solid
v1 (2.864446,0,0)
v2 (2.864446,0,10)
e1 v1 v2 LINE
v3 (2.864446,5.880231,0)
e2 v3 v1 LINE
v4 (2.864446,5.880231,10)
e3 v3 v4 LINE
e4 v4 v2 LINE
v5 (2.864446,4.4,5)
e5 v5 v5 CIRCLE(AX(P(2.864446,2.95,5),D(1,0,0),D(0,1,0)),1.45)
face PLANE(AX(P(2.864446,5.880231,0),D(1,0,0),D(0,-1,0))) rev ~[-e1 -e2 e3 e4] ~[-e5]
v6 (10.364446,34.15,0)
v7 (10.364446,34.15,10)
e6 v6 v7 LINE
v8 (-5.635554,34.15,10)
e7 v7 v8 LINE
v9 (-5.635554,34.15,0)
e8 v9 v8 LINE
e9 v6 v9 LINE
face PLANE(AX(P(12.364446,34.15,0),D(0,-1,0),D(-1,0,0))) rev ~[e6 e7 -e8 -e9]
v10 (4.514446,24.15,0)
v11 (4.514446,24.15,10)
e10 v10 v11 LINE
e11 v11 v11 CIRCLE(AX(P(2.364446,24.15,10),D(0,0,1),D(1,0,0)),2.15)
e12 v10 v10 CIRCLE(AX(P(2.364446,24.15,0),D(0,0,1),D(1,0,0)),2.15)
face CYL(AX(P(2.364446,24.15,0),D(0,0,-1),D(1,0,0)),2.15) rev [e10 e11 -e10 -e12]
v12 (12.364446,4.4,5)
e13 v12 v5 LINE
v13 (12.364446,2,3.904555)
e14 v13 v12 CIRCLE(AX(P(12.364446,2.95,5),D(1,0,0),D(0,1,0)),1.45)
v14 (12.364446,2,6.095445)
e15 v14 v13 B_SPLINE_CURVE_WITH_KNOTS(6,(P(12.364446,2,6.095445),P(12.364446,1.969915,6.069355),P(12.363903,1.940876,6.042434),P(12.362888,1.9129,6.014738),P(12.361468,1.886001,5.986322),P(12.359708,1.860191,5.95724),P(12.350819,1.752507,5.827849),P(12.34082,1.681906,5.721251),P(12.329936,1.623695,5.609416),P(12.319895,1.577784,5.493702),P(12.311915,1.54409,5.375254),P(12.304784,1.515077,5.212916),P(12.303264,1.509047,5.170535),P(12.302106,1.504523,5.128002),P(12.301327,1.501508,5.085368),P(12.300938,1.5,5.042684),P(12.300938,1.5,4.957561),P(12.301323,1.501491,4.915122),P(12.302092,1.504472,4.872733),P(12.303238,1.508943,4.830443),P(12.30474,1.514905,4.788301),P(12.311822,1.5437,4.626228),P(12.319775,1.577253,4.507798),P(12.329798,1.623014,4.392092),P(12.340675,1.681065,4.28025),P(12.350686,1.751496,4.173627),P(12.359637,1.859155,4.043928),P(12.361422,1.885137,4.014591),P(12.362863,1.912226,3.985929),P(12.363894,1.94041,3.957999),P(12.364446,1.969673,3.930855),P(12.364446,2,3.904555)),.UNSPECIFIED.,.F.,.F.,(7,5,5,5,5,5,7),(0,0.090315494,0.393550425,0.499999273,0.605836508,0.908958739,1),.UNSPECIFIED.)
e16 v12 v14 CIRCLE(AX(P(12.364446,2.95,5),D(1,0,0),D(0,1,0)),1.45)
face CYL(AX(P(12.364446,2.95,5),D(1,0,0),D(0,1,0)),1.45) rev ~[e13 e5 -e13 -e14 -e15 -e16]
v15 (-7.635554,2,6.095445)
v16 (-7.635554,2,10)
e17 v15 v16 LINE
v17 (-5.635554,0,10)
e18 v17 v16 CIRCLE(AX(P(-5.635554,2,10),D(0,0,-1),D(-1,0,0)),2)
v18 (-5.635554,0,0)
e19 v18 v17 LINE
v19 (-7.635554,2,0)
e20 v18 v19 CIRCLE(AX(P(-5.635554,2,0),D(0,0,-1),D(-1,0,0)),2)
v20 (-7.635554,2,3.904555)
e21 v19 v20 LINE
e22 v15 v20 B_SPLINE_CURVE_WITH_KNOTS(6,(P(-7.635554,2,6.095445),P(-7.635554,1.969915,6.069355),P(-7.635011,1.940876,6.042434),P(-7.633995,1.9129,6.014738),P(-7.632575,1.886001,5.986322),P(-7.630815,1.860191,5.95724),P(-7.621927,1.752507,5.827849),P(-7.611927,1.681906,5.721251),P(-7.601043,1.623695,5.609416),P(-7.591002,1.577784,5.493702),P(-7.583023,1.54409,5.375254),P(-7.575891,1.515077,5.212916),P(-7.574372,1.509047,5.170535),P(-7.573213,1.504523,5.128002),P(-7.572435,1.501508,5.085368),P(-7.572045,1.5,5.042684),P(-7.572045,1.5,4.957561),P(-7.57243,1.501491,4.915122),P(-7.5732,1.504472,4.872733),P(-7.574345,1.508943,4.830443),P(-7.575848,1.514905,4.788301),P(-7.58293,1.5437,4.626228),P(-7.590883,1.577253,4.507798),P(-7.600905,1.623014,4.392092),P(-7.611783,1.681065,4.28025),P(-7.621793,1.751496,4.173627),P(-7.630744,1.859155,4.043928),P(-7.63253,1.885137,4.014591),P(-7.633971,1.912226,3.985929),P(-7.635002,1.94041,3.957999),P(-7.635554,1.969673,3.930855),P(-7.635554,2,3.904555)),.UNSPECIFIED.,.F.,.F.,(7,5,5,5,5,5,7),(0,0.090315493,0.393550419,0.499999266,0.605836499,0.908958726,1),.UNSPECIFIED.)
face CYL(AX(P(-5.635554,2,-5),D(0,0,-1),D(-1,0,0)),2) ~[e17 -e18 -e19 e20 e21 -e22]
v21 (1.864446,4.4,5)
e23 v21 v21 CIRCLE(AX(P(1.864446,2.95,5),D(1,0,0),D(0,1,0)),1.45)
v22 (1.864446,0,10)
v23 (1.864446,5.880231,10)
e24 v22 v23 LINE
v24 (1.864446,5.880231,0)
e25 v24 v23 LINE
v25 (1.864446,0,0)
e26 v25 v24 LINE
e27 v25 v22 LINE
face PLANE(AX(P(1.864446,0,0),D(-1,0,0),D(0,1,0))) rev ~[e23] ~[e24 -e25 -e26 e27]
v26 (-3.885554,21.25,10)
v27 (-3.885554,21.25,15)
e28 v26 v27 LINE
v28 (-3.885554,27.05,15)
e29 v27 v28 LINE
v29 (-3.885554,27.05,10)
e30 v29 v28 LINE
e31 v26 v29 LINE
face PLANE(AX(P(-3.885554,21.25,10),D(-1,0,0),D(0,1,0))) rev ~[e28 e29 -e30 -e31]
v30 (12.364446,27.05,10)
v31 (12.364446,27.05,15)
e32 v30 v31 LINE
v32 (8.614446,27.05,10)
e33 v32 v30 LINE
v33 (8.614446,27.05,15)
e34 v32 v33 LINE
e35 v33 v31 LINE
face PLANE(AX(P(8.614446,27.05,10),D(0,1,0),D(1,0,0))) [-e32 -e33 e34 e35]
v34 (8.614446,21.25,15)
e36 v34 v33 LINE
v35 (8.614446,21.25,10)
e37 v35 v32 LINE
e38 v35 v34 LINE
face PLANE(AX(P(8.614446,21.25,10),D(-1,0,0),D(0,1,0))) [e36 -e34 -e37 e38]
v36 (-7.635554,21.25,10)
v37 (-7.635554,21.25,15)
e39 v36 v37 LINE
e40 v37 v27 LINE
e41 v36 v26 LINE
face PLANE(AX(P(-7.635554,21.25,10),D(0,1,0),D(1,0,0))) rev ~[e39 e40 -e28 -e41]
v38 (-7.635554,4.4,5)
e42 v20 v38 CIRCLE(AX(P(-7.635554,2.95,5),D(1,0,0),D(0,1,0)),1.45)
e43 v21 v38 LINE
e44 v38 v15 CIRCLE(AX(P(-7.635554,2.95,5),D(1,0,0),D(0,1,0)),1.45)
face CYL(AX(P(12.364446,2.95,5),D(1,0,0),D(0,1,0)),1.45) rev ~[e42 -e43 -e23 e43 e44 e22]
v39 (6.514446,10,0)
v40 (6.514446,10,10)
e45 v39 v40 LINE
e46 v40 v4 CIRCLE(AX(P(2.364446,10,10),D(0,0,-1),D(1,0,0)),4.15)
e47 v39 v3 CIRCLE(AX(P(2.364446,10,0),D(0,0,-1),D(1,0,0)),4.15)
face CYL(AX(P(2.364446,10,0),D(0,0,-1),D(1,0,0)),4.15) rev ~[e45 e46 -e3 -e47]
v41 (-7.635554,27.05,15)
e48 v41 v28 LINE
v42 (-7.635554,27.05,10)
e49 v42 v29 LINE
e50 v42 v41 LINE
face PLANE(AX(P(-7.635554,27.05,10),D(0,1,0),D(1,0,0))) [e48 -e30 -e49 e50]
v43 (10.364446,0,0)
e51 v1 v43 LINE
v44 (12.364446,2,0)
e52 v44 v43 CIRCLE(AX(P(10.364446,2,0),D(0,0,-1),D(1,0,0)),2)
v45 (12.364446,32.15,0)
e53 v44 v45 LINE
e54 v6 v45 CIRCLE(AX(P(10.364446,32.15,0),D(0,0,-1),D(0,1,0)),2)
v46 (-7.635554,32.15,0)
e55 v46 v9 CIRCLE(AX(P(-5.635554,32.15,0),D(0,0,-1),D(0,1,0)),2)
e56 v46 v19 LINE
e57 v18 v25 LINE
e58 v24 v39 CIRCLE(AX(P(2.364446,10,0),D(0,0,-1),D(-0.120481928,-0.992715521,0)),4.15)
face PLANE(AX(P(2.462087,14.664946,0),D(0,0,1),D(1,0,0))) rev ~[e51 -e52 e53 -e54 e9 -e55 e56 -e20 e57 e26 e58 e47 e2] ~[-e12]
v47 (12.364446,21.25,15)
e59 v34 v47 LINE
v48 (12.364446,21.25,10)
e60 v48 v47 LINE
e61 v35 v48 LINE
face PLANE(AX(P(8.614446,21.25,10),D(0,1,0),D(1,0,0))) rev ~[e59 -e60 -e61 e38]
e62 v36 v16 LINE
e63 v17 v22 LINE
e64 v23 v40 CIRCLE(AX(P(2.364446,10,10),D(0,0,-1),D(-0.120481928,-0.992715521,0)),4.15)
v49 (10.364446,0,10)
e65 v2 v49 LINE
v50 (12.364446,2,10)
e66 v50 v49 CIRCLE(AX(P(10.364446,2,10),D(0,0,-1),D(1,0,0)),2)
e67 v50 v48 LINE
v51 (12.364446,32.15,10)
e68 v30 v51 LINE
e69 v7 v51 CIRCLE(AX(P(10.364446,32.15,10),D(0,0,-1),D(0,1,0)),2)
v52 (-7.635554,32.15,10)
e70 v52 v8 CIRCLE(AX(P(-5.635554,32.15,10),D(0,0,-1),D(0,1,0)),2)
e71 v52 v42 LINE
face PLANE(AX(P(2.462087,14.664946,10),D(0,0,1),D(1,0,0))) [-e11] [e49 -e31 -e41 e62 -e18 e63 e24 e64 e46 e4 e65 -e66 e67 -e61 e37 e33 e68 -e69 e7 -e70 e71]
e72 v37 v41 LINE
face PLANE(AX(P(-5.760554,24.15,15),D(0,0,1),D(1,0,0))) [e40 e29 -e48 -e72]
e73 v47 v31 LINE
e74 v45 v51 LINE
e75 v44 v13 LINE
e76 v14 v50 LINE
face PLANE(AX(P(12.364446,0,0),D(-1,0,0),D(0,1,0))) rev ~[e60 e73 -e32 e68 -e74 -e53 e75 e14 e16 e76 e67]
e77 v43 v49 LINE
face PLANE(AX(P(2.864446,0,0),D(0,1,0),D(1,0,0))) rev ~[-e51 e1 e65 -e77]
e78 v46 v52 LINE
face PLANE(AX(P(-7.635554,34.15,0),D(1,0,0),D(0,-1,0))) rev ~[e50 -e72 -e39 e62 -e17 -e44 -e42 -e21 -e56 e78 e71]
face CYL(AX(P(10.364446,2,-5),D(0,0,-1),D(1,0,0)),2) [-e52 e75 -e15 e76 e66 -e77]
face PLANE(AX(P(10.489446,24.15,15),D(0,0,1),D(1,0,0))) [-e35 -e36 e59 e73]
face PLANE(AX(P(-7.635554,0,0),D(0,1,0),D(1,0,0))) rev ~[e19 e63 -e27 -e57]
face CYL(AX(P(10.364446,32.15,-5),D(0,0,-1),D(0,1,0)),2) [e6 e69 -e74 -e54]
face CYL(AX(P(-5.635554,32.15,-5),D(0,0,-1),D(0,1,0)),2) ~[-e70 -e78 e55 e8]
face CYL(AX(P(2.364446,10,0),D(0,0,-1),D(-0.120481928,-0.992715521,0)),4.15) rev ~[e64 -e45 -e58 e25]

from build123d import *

# Parameters (mm, degrees)
F0_R        = 2.15
F1_DEPTH    = 10
F2_W        = 3.75
F2_H        = 5.8
F3_DEPTH    = 5
F4_R        = 1.45
F5_DEPTH    = 25
F6_T1_DEPTH = 20


# Not quite as in the source:
# - a fillet or chamfer that OpenCascade refuses, or shapes differently, is made with other operations: its cross-section is extruded or revolved along the edge and cut away or added


with BuildPart() as f1:
    # F0 (on Top) → F1 (new body)
    with BuildSketch(Plane.XY):
        with BuildLine():
            Line((-7.6355537636, 34.15), (-7.6355537636, 0))
            Line((-7.6355537636, 0), (1.8644462364, 0))
            Line((1.8644462364, 0), (1.8644462364, 2.2661458509))
            ThreePointArc((1.8644462364, 2.2661458509), (-2.9359075253, 15.6540914389), (10.1144462364, 10))
            ThreePointArc((10.1144462364, 10), (8.0185376754, 4.6996462382), (2.8644462364, 2.2661458509))
            Line((2.8644462364, 2.2661458509), (2.8644462364, 0))
            Line((2.8644462364, 0), (12.3644462364, 0))
            Line((12.3644462364, 0), (12.3644462364, 34.15))
            Line((12.3644462364, 34.15), (-7.6355537636, 34.15))
        make_face()
        with Locations((2.3644462364, 24.15)):
            Circle(F0_R, mode=Mode.SUBTRACT)
        with BuildLine():
            ThreePointArc((10.1144462364, 10), (-2.9359075253, 15.6540914389), (1.8644462364, 2.2661458509))
            Line((1.8644462364, 2.2661458509), (1.8644462364, 5.880230589))
            ThreePointArc((1.8644462364, 5.880230589), (-0.387598458, 13.1062437123), (6.5144462364, 10))
            ThreePointArc((6.5144462364, 10), (5.4706899487, 7.2479553056), (2.8644462364, 5.880230589))
            Line((2.8644462364, 5.880230589), (2.8644462364, 2.2661458509))
            ThreePointArc((2.8644462364, 2.2661458509), (8.0185376754, 4.6996462382), (10.1144462364, 10))
        make_face()
    extrude(amount=F1_DEPTH)

    # F2 (on face) → F3 (join)
    with BuildSketch(Plane.XY.offset(10)):
        with Locations((-5.7605537636, 24.15)):
            Rectangle(F2_W, F2_H)
        with Locations((10.4894462364, 24.15)):
            Rectangle(F2_W, F2_H)
    extrude(amount=F3_DEPTH)

    # F4 (on face) → F5 (cut)
    with BuildSketch(Plane.YZ.offset(12.3644462364)):
        with Locations((2.95, 5)):
            Circle(F4_R)
    extrude(amount=-F5_DEPTH, mode=Mode.SUBTRACT)

    # F6: fillet of radius 2 on 4 edges, made by hand

    # F6_s2 → F6_t1 (cut)
    with BuildSketch(Plane.XY.offset(-5)):
        with BuildLine():
            ThreePointArc((12.3644462364, 2), (11.7786597988, 0.5857864376), (10.3644462364, 0))
            Line((10.3644462364, 0), (12.3644462364, 0))
            Line((12.3644462364, 0), (12.3644462364, 2))
        make_face()
        with BuildLine():
            ThreePointArc((-7.6355537636, 2), (-7.0497673259, 0.5857864376), (-5.6355537636, 0))
            Line((-5.6355537636, 0), (-7.6355537636, 0))
            Line((-7.6355537636, 0), (-7.6355537636, 2))
        make_face()
        with BuildLine():
            ThreePointArc((10.3644462364, 34.15), (11.7786597988, 33.5642135624), (12.3644462364, 32.15))
            Line((12.3644462364, 32.15), (12.3644462364, 34.15))
            Line((12.3644462364, 34.15), (10.3644462364, 34.15))
        make_face()
        with BuildLine():
            ThreePointArc((-5.6355537636, 34.15), (-7.0497673259, 33.5642135624), (-7.6355537636, 32.15))
            Line((-7.6355537636, 32.15), (-7.6355537636, 34.15))
            Line((-7.6355537636, 34.15), (-5.6355537636, 34.15))
        make_face()
    extrude(amount=F6_T1_DEPTH, mode=Mode.SUBTRACT)


solid = f1.part
